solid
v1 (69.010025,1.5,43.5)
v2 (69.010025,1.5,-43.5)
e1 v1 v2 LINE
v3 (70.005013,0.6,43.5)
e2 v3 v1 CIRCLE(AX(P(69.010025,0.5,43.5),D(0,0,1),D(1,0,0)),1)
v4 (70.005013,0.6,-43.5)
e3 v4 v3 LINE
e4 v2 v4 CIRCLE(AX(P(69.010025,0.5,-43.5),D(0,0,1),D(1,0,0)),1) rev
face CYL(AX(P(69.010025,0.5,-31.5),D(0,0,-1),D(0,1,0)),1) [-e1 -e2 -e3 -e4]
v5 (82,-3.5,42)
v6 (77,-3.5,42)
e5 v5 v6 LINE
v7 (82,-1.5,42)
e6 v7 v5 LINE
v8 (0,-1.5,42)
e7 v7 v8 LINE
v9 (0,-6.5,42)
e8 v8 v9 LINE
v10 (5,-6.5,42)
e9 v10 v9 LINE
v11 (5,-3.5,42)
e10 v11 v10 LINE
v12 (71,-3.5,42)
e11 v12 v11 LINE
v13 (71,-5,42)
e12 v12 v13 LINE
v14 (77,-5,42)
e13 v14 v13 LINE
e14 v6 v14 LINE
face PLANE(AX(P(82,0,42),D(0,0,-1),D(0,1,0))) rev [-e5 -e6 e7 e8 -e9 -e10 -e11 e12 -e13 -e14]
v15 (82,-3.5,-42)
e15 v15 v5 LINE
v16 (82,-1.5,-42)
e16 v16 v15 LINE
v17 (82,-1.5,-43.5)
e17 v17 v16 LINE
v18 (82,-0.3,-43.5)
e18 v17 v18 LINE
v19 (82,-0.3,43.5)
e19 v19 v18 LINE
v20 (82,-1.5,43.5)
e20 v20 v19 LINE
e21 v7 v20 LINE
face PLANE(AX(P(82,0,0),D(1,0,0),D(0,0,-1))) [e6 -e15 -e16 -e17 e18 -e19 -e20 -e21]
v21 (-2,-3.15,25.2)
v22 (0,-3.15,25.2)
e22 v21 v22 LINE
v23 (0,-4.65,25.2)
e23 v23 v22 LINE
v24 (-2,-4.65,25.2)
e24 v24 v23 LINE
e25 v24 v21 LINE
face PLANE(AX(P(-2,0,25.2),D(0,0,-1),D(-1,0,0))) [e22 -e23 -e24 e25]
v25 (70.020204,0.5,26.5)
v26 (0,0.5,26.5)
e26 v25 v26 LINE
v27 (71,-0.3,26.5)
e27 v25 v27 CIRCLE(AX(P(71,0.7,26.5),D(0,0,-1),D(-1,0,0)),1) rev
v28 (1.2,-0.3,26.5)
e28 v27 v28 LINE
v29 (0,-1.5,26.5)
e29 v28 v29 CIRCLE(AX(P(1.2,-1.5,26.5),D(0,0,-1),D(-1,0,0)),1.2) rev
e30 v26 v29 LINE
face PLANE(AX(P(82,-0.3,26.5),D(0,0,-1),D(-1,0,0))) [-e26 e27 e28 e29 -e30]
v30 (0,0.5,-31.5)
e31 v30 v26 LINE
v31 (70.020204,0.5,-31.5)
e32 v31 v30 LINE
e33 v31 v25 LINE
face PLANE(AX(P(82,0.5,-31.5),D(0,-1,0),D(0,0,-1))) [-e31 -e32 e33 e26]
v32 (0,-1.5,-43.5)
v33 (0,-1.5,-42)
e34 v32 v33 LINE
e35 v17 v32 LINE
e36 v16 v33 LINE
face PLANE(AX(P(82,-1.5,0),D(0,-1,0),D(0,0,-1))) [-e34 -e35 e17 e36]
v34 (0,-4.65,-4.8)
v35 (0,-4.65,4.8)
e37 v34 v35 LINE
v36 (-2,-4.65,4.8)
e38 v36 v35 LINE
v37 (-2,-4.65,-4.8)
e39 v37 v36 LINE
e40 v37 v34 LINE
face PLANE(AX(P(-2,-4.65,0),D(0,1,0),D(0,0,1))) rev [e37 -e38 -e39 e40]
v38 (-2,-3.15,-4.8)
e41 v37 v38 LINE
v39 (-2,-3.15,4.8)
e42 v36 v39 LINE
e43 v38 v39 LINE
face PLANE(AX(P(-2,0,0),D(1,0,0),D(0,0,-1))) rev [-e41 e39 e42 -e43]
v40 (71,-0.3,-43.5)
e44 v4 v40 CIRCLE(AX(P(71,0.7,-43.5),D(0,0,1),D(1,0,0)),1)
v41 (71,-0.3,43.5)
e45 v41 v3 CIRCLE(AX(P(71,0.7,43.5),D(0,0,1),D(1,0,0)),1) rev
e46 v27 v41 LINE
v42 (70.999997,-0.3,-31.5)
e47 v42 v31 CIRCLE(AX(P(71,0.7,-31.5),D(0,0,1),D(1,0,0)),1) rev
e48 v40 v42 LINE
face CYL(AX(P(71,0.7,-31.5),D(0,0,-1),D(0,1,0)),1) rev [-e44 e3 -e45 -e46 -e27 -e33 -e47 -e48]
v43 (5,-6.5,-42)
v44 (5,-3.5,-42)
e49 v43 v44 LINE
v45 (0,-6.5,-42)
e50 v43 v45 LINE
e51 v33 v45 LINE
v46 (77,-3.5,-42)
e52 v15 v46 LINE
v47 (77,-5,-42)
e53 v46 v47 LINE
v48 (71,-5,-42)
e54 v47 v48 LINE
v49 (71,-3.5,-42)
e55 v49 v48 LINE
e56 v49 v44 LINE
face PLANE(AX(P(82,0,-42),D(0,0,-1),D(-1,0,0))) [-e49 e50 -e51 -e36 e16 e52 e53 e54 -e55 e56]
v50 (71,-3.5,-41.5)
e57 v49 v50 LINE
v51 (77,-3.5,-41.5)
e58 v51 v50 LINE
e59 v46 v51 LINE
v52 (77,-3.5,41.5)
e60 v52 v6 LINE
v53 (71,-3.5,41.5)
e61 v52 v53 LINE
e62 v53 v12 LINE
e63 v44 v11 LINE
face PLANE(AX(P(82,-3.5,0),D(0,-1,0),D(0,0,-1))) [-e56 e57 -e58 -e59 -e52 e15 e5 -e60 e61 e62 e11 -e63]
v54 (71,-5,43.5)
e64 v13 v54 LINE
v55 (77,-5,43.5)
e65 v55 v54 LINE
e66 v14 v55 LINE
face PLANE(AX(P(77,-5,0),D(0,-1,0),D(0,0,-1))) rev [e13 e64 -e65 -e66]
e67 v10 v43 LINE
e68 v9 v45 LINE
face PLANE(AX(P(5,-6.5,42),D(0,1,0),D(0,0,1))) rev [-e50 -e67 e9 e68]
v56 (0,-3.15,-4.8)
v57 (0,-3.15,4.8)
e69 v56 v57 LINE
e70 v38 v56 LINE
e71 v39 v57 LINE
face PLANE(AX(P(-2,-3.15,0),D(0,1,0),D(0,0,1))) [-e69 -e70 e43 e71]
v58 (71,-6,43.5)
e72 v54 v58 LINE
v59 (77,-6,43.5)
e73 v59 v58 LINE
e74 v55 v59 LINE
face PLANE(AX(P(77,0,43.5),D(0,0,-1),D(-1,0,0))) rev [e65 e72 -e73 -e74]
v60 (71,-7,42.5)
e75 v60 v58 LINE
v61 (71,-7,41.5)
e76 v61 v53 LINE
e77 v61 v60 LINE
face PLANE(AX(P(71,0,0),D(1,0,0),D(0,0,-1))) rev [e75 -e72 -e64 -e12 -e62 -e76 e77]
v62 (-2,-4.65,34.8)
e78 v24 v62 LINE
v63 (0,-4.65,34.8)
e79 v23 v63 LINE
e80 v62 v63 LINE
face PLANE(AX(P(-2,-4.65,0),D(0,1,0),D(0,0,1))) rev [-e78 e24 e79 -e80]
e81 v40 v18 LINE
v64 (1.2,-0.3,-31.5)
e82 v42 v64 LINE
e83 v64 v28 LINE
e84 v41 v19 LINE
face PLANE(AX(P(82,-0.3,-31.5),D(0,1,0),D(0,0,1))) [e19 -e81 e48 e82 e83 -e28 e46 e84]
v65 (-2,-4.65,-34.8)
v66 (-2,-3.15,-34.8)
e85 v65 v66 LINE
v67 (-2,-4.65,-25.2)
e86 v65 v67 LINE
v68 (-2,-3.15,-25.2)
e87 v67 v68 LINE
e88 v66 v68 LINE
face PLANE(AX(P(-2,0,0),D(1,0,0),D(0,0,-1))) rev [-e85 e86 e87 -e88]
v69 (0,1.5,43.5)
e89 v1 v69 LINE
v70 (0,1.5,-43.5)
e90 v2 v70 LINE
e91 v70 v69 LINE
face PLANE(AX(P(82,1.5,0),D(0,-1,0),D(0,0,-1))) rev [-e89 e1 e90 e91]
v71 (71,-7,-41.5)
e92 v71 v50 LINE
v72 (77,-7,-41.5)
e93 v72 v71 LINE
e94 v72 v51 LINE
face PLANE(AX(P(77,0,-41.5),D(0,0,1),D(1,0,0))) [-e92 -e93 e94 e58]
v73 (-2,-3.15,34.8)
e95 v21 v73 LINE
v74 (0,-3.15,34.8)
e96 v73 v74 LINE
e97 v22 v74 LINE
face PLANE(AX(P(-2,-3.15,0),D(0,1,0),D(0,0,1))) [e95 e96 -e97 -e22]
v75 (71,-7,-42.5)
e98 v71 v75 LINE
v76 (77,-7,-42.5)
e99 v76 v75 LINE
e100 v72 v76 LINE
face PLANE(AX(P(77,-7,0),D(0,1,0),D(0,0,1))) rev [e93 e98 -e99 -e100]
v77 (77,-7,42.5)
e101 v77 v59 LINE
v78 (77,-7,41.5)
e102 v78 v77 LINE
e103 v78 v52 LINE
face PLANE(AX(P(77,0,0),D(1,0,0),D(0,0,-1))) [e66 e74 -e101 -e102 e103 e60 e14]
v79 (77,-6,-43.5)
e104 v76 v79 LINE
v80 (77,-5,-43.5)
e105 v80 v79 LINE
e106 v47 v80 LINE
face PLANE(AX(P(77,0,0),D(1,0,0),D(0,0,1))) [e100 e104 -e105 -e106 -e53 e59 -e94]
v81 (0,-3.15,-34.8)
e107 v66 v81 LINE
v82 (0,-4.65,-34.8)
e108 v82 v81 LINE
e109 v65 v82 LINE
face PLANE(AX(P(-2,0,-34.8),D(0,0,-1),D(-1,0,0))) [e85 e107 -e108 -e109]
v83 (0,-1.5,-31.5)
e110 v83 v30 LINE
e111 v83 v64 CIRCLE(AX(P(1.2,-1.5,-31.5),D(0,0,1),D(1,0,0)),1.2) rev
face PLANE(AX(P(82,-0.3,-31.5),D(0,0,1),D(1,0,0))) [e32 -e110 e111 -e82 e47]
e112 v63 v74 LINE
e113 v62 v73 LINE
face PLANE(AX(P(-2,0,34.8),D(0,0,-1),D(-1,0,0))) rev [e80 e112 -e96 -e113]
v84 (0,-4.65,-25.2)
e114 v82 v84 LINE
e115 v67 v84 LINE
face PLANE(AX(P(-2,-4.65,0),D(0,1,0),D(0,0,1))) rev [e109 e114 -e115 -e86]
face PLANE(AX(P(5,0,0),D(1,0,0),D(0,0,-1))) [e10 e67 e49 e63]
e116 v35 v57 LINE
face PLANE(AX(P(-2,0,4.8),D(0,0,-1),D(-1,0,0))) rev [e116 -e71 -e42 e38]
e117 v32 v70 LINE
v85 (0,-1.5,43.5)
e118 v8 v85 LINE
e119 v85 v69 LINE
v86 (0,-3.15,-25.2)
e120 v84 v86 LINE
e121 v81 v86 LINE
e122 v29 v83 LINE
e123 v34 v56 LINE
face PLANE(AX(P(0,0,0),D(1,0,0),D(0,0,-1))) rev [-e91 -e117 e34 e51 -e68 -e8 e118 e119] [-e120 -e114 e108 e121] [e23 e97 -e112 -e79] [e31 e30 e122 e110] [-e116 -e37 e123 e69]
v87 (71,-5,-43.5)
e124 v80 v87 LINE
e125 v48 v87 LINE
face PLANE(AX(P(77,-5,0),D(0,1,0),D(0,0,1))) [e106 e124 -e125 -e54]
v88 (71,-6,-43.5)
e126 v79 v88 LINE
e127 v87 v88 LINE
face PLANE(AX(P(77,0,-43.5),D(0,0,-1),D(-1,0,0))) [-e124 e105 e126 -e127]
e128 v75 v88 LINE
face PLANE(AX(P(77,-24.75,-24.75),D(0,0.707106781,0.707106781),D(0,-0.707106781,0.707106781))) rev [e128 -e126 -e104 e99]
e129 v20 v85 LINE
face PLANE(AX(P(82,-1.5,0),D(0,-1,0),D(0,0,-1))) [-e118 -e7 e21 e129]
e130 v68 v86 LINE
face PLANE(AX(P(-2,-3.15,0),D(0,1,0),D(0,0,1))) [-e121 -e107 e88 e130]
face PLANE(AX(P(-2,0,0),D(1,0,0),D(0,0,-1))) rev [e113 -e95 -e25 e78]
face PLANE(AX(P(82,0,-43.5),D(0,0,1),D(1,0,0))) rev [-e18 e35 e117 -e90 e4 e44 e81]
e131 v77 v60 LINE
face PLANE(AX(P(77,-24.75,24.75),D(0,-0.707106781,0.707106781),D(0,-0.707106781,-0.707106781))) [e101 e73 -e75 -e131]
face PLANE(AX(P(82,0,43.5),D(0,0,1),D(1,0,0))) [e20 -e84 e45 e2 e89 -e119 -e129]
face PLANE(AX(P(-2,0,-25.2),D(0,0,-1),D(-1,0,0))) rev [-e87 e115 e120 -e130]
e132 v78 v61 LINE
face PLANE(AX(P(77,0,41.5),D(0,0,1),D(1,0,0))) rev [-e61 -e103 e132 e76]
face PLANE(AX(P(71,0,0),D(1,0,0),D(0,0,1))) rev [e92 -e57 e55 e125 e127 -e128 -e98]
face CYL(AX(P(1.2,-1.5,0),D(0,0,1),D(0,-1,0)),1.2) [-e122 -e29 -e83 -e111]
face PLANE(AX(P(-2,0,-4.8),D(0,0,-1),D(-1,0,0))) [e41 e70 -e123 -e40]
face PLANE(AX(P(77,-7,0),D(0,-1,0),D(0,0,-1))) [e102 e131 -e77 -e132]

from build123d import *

# Parameters (mm, degrees)
SKETCH_2_W          = 87
SKETCH_2_H          = 3
SKETCH_2_W_2        = 2
SKETCH_2_H_2        = 2
SKETCH_2_W_3        = 80
EXTRUDE_1_DEPTH     = 82
SKETCH_3_W          = 84
SKETCH_3_H          = 8
EXTRUDE_2_DEPTH     = 5
SKETCH_3_3_W        = 9.6
SKETCH_3_3_H        = 1.5
EXTRUDE_3_DEPTH     = 2
SKETCH_4_W          = 58
SKETCH_4_H          = 0.8
CUT_EXTRUDE_1_DEPTH = 94.051061251
FILLET_1_R          = 1.2
CUT_EXTRUDE_START   = -0.3
CUT_EXTRUDE_2_DEPTH = 94.351061251
EXTRUDE_START       = 71
EXTRUDE_4_DEPTH     = 6
FILLET_2_R          = 1
FILLET_3_R          = 1


# Some blends are built 0.0001 mm under size
with BuildPart() as part:
    # Эскиз2 → Бобышка-Вытянуть1 (new body)
    with BuildSketch(Plane(origin=(0, 0, 0), x_dir=(0, 0, -1), z_dir=(1, 0, 0))):
        Rectangle(SKETCH_2_W, SKETCH_2_H)
        with Locations((-41, -2.5)):
            Rectangle(SKETCH_2_W_2, SKETCH_2_H_2)
        with Locations((41, -2.5)):
            Rectangle(SKETCH_2_W_2, SKETCH_2_H_2)
        with Locations((0, -2.5)):
            Rectangle(SKETCH_2_W_3, SKETCH_2_H_2)
    extrude(amount=EXTRUDE_1_DEPTH)

    # Эскиз3 → Бобышка-Вытянуть2 (add)
    with BuildSketch(Plane(origin=(0, 0, 0), x_dir=(0, 0, -1), z_dir=(1, 0, 0))):
        with Locations((0, -2.5)):
            Rectangle(SKETCH_3_W, SKETCH_3_H)
    extrude(amount=EXTRUDE_2_DEPTH)

    # Эскиз3<3> → Бобышка-Вытянуть3 (add)
    with BuildSketch(Plane(origin=(0, 0, 0), x_dir=(0, 0, -1), z_dir=(1, 0, 0))):
        with Locations((30, -3.9)):
            Rectangle(SKETCH_3_3_W, SKETCH_3_3_H)
        with Locations((0, -3.9)):
            Rectangle(SKETCH_3_3_W, SKETCH_3_3_H)
        with Locations((-30, -3.9)):
            Rectangle(SKETCH_3_3_W, SKETCH_3_3_H)
    extrude(amount=-EXTRUDE_3_DEPTH)

    # Эскиз4 → Вырез-Вытянуть1 (cut, through all)
    with BuildSketch(Plane(origin=(0, 0, 0), x_dir=(0, 0, -1), z_dir=(1, 0, 0))):
        with Locations((2.5, 0.1)):
            Rectangle(SKETCH_4_W, SKETCH_4_H)
    extrude(amount=CUT_EXTRUDE_1_DEPTH, mode=Mode.SUBTRACT)

    # Скругление1
    fillet_1_edges = [part.edges().sort_by_distance(p)[0] for p in [
        (0, -0.3, -2.5),
    ]]
    fillet(fillet_1_edges, radius=FILLET_1_R)

    # Эскиз5 → Вырез-Вытянуть2 (cut, through all)
    with BuildSketch(Plane(origin=(0, 0, 0), x_dir=(1, 0, 0), z_dir=(0, 1, 0)).offset(CUT_EXTRUDE_START)):
        Polygon((70, -47.531126979), (70, 0), (70, 45.964828752), (87.651611458, 45.964828752), (87.651611458, -47.531126979), align=None)
    extrude(amount=CUT_EXTRUDE_2_DEPTH, mode=Mode.SUBTRACT)

    # Эскиз6 → Бобышка-Вытянуть4 (add)
    with BuildSketch(Plane(origin=(0, 0, 0), x_dir=(0, 0, -1), z_dir=(1, 0, 0)).offset(EXTRUDE_START)):
        Polygon((-41.5, -3.049635954), (-42, -3.049635954), (-42, -5), (-43.5, -5), (-43.5, -6), (-42.5, -7), (-42, -7), (-41.5, -7), align=None)
    extrude_4 = extrude(amount=EXTRUDE_4_DEPTH)

    # Скругление2
    # the kernel refuses this fillet: 1 mm, written as the material it adds along each edge
    with BuildSketch(Plane(origin=(70, -0.3, 24), x_dir=(1, 0, 0), z_dir=(0, 0, 1))) as fillet_2_piece_1_section:
        with BuildLine():
            CenterArc((FILLET_2_R, FILLET_2_R), FILLET_2_R, 180, 90)
            Line((0, FILLET_2_R), (-FILLET_2_R * 0.02, FILLET_2_R))
            Line((-FILLET_2_R * 0.02, FILLET_2_R), (-FILLET_2_R * 0.02, -FILLET_2_R * 0.02))
            Line((-FILLET_2_R * 0.02, -FILLET_2_R * 0.02), (FILLET_2_R, -FILLET_2_R * 0.02))
            Line((FILLET_2_R, -FILLET_2_R * 0.02), (FILLET_2_R, 0))
        make_face()
    fillet_2_piece_1 = extrude(amount=19.5, mode=Mode.PRIVATE)
    fillet_2_piece_1 = split(fillet_2_piece_1, bisect_by=Plane(origin=(69.994030939, 0.5, 25.25), z_dir=(0, 1, 0)), keep=Keep.TOP, mode=Mode.PRIVATE)
    fillet_2_piece_1 = split(fillet_2_piece_1, bisect_by=Plane(origin=(69.994030939, 0.587417507, 26.5), z_dir=(0, 0, -1)), keep=Keep.TOP, mode=Mode.PRIVATE)
    with BuildSketch(Plane(origin=(70, -0.3, 26.5), x_dir=(1, 0, 0), z_dir=(0, 0, 1))) as fillet_2_piece_2_section:
        with BuildLine():
            CenterArc((FILLET_2_R, FILLET_2_R), FILLET_2_R, 180, 90)
            Line((0, FILLET_2_R), (-FILLET_2_R * 0.02, FILLET_2_R))
            Line((-FILLET_2_R * 0.02, FILLET_2_R), (-FILLET_2_R * 0.02, -FILLET_2_R * 0.02))
            Line((-FILLET_2_R * 0.02, -FILLET_2_R * 0.02), (FILLET_2_R, -FILLET_2_R * 0.02))
            Line((FILLET_2_R, -FILLET_2_R * 0.02), (FILLET_2_R, 0))
        make_face()
    fillet_2_piece_2 = extrude(amount=17, mode=Mode.PRIVATE)
    fillet_2_piece_2 = split(fillet_2_piece_2, bisect_by=Plane(origin=(70.231366514, 0.5, 35), z_dir=(0, -1, 0)), keep=Keep.TOP, mode=Mode.PRIVATE)
    with BuildSketch(Plane(origin=(70, -0.3, 26.5), x_dir=(1, 0, 0), z_dir=(0, 0, 1))) as fillet_2_piece_3_section:
        with BuildLine():
            CenterArc((FILLET_2_R, FILLET_2_R), FILLET_2_R, 180, 90)
            Line((0, FILLET_2_R), (-FILLET_2_R * 0.02, FILLET_2_R))
            Line((-FILLET_2_R * 0.02, FILLET_2_R), (-FILLET_2_R * 0.02, -FILLET_2_R * 0.02))
            Line((-FILLET_2_R * 0.02, -FILLET_2_R * 0.02), (FILLET_2_R, -FILLET_2_R * 0.02))
            Line((FILLET_2_R, -FILLET_2_R * 0.02), (FILLET_2_R, 0))
        make_face()
    fillet_2_piece_3 = extrude(amount=17, mode=Mode.PRIVATE)
    fillet_2_piece_3 = split(fillet_2_piece_3, bisect_by=Plane(origin=(69.994030939, 0.5, 35), z_dir=(0, 1, 0)), keep=Keep.TOP, mode=Mode.PRIVATE)
    add([fillet_2_piece_1, fillet_2_piece_2, fillet_2_piece_3])
    fillet_2_2_edges = [part.edges().sort_by_distance(p)[0] for p in [
        (70, -0.3, -37.5),
    ]]
    fillet(fillet_2_2_edges, radius=FILLET_2_R - 0.0001)  # a hair under: the kernel refuses the full size

    # Зеркальное отражение1: Бобышка-Вытянуть4 across plane
    add(extrude_4.mirror(Plane.XY))

    # Скругление3
    # the kernel refuses this fillet: 1 mm, written as the material it takes off along each edge
    with BuildSketch(Plane(origin=(70, 1.5, -45.974961047), x_dir=(0.005563569274726223, -0.9999845232286975, 0), z_dir=(0, 0, 1))) as fillet_3_piece_1:
        with BuildLine():
            CenterArc((0.994476676, -0.995532666), FILLET_3_R, 95.417808371, 84.263420946)
            Line((-0.005507847, -0.989969097), (-0.105506299, -0.98941274))
            Line((-0.105506299, -0.98941274), (-0.099998452, 0.000556357))
            Line((-0.099998452, 0.000556357), (0.000556357, 0.099998452))
            ThreePointArc((0.000556357, 0.099998452), (0.800643974, 0.095547041), (0.890617158, 0.099553267))
            Line((0.890617158, 0.099553267), (0.900058932, 0))
        make_face()
    fillet_3_piece_1_solid = extrude(amount=69.974960039, mode=Mode.PRIVATE)
    with BuildSketch(Plane(origin=(70, 1.5, 23.999998992), x_dir=(0.00556942794624549, -0.9999844906159053, 0), z_dir=(0, 0, 1))) as fillet_3_piece_2:
        with BuildLine():
            CenterArc((0.994470897, -0.995528948), FILLET_3_R, 95.420064112, 84.260829523)
            Line((-0.005513594, -0.98995952), (-0.105512043, -0.989402578))
            Line((-0.105512043, -0.989402578), (-0.099998449, 0.000556943))
            Line((-0.099998449, 0.000556943), (0.000556943, 0.099998449))
            ThreePointArc((0.000556943, 0.099998449), (0.800544535, 0.095542907), (0.890568265, 0.099552895))
            Line((0.890568265, 0.099552895), (0.900013959, 0))
        make_face()
    fillet_3_piece_2_solid = extrude(amount=21.974938193, mode=Mode.PRIVATE)
    add([fillet_3_piece_1_solid, fillet_3_piece_2_solid], mode=Mode.SUBTRACT)


solid = part.part
